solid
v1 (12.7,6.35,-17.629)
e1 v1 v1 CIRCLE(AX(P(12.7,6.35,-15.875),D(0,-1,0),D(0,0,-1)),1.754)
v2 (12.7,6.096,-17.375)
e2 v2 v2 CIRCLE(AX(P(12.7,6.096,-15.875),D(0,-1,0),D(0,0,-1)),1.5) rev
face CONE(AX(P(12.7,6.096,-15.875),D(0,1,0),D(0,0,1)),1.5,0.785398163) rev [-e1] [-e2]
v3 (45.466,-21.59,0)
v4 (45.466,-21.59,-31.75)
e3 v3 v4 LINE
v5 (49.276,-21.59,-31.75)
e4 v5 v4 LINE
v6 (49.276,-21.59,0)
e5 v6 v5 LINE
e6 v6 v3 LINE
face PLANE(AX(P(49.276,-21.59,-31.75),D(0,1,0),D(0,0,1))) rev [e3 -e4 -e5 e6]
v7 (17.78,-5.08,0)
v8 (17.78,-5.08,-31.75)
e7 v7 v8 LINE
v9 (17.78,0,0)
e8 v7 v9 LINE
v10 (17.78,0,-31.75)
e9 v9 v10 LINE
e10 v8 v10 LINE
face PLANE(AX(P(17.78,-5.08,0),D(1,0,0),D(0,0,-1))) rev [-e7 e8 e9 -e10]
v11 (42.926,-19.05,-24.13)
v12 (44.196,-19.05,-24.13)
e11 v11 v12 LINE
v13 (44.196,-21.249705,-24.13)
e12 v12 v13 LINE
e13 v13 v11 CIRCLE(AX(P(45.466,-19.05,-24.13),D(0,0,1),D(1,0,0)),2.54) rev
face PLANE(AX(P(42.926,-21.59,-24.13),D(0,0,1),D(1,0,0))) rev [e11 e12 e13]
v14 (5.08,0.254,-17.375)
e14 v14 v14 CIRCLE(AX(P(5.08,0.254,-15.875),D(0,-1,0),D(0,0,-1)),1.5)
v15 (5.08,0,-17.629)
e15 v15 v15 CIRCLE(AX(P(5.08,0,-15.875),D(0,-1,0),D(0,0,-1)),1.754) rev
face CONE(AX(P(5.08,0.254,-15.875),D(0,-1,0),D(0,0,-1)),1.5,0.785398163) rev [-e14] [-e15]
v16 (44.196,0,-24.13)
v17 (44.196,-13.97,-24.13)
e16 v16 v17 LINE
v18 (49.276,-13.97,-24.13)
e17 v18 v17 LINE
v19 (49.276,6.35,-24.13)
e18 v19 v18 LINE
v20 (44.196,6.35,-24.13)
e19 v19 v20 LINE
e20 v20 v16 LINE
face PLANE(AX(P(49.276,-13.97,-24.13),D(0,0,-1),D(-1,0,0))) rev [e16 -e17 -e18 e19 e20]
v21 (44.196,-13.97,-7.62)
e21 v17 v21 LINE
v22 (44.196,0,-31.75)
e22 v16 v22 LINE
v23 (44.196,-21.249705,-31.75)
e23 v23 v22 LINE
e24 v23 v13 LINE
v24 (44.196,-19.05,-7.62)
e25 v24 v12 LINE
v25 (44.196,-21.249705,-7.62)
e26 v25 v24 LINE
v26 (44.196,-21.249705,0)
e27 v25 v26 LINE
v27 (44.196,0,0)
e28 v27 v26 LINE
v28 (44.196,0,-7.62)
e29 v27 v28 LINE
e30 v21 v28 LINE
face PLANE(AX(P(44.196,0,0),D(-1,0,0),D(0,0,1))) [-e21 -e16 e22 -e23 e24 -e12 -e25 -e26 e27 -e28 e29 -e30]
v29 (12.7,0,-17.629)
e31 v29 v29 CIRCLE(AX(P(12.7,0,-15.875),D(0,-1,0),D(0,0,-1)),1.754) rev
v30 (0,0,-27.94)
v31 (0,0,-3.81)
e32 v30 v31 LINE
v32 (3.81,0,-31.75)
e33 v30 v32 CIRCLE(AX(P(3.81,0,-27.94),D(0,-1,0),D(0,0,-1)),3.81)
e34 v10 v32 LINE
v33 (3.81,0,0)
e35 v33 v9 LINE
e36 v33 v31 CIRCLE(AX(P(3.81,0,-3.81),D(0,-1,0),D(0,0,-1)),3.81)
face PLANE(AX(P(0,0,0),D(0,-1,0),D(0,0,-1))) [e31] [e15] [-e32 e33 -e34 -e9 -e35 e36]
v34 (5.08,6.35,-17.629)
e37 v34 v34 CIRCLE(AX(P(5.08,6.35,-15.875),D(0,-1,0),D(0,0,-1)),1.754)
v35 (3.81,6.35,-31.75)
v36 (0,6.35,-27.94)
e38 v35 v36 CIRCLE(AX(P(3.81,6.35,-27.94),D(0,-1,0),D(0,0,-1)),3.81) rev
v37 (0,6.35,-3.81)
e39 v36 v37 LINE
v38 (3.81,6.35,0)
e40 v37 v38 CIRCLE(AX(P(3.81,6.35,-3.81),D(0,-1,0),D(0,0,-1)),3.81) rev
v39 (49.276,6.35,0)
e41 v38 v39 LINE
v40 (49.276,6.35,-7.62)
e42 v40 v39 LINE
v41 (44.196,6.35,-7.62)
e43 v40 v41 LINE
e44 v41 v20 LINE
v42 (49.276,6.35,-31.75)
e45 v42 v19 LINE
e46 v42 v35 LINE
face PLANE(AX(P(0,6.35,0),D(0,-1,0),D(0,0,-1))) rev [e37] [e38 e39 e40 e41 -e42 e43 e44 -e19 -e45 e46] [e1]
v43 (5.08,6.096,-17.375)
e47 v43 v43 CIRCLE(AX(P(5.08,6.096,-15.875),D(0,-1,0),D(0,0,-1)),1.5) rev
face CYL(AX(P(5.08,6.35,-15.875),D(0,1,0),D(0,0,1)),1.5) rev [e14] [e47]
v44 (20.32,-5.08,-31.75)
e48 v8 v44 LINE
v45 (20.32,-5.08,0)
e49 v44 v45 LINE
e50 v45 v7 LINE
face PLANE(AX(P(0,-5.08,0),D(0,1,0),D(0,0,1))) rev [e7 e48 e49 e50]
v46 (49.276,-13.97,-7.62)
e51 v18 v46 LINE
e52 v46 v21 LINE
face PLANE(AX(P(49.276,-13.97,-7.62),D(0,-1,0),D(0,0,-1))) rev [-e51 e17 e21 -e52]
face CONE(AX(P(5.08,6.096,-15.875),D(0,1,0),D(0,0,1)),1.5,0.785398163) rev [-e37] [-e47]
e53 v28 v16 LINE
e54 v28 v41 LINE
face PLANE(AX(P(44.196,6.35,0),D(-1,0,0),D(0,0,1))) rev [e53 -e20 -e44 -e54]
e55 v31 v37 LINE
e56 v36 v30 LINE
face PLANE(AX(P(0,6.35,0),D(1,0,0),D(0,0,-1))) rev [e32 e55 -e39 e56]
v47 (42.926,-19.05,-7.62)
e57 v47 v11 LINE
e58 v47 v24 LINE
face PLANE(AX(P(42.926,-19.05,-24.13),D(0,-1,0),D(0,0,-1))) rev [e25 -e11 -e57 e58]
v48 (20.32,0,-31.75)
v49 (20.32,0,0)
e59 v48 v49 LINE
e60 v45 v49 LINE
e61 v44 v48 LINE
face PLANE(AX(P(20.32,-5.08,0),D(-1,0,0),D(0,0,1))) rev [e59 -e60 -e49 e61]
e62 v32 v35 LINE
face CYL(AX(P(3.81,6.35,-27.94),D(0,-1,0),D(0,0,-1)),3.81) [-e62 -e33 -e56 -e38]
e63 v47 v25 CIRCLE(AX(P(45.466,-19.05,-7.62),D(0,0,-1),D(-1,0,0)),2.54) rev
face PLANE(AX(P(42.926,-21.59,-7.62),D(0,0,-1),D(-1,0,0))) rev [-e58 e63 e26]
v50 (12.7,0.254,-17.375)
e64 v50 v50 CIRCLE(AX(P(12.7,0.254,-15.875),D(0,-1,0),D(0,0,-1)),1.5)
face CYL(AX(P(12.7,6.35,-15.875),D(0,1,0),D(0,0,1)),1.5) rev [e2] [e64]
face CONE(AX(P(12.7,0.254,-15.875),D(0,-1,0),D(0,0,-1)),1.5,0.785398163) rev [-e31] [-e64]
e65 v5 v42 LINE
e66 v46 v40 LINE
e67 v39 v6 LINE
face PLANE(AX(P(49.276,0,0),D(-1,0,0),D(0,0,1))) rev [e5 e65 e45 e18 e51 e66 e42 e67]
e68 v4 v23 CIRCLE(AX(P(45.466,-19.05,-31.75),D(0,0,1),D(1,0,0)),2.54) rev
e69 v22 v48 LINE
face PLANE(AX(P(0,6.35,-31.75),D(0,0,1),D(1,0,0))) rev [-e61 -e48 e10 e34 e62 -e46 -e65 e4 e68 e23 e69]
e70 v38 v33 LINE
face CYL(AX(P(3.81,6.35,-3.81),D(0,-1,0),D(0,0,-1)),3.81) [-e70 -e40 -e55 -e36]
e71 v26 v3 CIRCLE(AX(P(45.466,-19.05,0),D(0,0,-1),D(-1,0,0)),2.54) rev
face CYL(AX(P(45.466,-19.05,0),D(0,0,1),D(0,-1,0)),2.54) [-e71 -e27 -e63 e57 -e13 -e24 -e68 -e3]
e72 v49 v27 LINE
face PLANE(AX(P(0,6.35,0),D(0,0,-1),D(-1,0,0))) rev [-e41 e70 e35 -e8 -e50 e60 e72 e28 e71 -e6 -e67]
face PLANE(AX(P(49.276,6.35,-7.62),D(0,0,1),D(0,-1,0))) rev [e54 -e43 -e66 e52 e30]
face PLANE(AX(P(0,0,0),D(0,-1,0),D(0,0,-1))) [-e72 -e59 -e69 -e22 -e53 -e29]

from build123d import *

# Parameters (mm, degrees)
SKETCH1_W             = 44.196
SKETCH1_H             = 31.75
BOSS_EXTRUDE1_DEPTH   = 6.35
SKETCH3_W             = 2.54
SKETCH3_H             = 31.75
BOSS_EXTRUDE3_DEPTH   = 5.08
F_3_0MM_DOWEL_HOLE1_D = 3
CHAMFER1_SIZE         = 0.254
FILLET2_R             = 3.81
BOSS_EXTRUDE4_DEPTH   = 5.08
SKETCH7_W             = 16.51
SKETCH7_H             = 2.54
BOSS_EXTRUDE5_DEPTH   = 1.27
FILLET3_R             = 2.54


with BuildPart() as part:
    # Sketch1 → Boss-Extrude1 (new body)
    with BuildSketch(Plane(origin=(0, 0, 0), x_dir=(1, 0, 0), z_dir=(0, 1, 0))):
        with Locations((22.098, 15.875)):
            Rectangle(SKETCH1_W, SKETCH1_H)
    extrude(amount=BOSS_EXTRUDE1_DEPTH)

    # Sketch3 → Boss-Extrude3 (add)
    with BuildSketch(Plane.XZ):
        with Locations((19.05, -15.875)):
            Rectangle(SKETCH3_W, SKETCH3_H)
    extrude(amount=BOSS_EXTRUDE3_DEPTH)

    # Ø3.0mm Dowel Hole1 (through all)
    with Locations(Plane(origin=(0, 6.35, 0), x_dir=(1, 0, 0), z_dir=(0, 1, 0))):
        with Locations((5.08, 15.875), (12.7, 15.875)):
            Hole(F_3_0MM_DOWEL_HOLE1_D / 2)

    # Chamfer1
    chamfer1_edges = [part.edges().sort_by_distance(p)[0] for p in [
        (14.2, 0, -15.875),
        (14.2, 6.35, -15.875),
        (6.58, 0, -15.875),
        (6.58, 6.35, -15.875),
    ]]
    chamfer(chamfer1_edges, length=CHAMFER1_SIZE)

    # Fillet2
    fillet2_edges = [part.edges().sort_by_distance(p)[0] for p in [
        (0, 3.175, 0),
        (0, 3.175, -31.75),
    ]]
    fillet(fillet2_edges, radius=FILLET2_R)

    # Sketch6 → Boss-Extrude4 (add)
    with BuildSketch(Plane(origin=(44.196, 0, 0), x_dir=(0, 0, -1), z_dir=(1, 0, 0))):
        Polygon((0, 6.35), (0, -21.59), (31.75, -21.59), (31.75, 6.35), (24.13, 6.35), (24.13, -13.97), (7.62, -13.97), (7.62, 6.35), align=None)
    extrude(amount=BOSS_EXTRUDE4_DEPTH)

    # Sketch7 → Boss-Extrude5 (add)
    with BuildSketch(Plane.ZY.offset(-44.196)):
        with Locations((-15.875, -20.32)):
            Rectangle(SKETCH7_W, SKETCH7_H)
    extrude(amount=BOSS_EXTRUDE5_DEPTH)

    # Fillet3
    fillet3_edges = [part.edges().sort_by_distance(p)[0] for p in [
        (42.926, -21.59, -15.875),
    ]]
    fillet(fillet3_edges, radius=FILLET3_R - 0.0001)  # a hair under: the kernel refuses the full size


solid = part.part
